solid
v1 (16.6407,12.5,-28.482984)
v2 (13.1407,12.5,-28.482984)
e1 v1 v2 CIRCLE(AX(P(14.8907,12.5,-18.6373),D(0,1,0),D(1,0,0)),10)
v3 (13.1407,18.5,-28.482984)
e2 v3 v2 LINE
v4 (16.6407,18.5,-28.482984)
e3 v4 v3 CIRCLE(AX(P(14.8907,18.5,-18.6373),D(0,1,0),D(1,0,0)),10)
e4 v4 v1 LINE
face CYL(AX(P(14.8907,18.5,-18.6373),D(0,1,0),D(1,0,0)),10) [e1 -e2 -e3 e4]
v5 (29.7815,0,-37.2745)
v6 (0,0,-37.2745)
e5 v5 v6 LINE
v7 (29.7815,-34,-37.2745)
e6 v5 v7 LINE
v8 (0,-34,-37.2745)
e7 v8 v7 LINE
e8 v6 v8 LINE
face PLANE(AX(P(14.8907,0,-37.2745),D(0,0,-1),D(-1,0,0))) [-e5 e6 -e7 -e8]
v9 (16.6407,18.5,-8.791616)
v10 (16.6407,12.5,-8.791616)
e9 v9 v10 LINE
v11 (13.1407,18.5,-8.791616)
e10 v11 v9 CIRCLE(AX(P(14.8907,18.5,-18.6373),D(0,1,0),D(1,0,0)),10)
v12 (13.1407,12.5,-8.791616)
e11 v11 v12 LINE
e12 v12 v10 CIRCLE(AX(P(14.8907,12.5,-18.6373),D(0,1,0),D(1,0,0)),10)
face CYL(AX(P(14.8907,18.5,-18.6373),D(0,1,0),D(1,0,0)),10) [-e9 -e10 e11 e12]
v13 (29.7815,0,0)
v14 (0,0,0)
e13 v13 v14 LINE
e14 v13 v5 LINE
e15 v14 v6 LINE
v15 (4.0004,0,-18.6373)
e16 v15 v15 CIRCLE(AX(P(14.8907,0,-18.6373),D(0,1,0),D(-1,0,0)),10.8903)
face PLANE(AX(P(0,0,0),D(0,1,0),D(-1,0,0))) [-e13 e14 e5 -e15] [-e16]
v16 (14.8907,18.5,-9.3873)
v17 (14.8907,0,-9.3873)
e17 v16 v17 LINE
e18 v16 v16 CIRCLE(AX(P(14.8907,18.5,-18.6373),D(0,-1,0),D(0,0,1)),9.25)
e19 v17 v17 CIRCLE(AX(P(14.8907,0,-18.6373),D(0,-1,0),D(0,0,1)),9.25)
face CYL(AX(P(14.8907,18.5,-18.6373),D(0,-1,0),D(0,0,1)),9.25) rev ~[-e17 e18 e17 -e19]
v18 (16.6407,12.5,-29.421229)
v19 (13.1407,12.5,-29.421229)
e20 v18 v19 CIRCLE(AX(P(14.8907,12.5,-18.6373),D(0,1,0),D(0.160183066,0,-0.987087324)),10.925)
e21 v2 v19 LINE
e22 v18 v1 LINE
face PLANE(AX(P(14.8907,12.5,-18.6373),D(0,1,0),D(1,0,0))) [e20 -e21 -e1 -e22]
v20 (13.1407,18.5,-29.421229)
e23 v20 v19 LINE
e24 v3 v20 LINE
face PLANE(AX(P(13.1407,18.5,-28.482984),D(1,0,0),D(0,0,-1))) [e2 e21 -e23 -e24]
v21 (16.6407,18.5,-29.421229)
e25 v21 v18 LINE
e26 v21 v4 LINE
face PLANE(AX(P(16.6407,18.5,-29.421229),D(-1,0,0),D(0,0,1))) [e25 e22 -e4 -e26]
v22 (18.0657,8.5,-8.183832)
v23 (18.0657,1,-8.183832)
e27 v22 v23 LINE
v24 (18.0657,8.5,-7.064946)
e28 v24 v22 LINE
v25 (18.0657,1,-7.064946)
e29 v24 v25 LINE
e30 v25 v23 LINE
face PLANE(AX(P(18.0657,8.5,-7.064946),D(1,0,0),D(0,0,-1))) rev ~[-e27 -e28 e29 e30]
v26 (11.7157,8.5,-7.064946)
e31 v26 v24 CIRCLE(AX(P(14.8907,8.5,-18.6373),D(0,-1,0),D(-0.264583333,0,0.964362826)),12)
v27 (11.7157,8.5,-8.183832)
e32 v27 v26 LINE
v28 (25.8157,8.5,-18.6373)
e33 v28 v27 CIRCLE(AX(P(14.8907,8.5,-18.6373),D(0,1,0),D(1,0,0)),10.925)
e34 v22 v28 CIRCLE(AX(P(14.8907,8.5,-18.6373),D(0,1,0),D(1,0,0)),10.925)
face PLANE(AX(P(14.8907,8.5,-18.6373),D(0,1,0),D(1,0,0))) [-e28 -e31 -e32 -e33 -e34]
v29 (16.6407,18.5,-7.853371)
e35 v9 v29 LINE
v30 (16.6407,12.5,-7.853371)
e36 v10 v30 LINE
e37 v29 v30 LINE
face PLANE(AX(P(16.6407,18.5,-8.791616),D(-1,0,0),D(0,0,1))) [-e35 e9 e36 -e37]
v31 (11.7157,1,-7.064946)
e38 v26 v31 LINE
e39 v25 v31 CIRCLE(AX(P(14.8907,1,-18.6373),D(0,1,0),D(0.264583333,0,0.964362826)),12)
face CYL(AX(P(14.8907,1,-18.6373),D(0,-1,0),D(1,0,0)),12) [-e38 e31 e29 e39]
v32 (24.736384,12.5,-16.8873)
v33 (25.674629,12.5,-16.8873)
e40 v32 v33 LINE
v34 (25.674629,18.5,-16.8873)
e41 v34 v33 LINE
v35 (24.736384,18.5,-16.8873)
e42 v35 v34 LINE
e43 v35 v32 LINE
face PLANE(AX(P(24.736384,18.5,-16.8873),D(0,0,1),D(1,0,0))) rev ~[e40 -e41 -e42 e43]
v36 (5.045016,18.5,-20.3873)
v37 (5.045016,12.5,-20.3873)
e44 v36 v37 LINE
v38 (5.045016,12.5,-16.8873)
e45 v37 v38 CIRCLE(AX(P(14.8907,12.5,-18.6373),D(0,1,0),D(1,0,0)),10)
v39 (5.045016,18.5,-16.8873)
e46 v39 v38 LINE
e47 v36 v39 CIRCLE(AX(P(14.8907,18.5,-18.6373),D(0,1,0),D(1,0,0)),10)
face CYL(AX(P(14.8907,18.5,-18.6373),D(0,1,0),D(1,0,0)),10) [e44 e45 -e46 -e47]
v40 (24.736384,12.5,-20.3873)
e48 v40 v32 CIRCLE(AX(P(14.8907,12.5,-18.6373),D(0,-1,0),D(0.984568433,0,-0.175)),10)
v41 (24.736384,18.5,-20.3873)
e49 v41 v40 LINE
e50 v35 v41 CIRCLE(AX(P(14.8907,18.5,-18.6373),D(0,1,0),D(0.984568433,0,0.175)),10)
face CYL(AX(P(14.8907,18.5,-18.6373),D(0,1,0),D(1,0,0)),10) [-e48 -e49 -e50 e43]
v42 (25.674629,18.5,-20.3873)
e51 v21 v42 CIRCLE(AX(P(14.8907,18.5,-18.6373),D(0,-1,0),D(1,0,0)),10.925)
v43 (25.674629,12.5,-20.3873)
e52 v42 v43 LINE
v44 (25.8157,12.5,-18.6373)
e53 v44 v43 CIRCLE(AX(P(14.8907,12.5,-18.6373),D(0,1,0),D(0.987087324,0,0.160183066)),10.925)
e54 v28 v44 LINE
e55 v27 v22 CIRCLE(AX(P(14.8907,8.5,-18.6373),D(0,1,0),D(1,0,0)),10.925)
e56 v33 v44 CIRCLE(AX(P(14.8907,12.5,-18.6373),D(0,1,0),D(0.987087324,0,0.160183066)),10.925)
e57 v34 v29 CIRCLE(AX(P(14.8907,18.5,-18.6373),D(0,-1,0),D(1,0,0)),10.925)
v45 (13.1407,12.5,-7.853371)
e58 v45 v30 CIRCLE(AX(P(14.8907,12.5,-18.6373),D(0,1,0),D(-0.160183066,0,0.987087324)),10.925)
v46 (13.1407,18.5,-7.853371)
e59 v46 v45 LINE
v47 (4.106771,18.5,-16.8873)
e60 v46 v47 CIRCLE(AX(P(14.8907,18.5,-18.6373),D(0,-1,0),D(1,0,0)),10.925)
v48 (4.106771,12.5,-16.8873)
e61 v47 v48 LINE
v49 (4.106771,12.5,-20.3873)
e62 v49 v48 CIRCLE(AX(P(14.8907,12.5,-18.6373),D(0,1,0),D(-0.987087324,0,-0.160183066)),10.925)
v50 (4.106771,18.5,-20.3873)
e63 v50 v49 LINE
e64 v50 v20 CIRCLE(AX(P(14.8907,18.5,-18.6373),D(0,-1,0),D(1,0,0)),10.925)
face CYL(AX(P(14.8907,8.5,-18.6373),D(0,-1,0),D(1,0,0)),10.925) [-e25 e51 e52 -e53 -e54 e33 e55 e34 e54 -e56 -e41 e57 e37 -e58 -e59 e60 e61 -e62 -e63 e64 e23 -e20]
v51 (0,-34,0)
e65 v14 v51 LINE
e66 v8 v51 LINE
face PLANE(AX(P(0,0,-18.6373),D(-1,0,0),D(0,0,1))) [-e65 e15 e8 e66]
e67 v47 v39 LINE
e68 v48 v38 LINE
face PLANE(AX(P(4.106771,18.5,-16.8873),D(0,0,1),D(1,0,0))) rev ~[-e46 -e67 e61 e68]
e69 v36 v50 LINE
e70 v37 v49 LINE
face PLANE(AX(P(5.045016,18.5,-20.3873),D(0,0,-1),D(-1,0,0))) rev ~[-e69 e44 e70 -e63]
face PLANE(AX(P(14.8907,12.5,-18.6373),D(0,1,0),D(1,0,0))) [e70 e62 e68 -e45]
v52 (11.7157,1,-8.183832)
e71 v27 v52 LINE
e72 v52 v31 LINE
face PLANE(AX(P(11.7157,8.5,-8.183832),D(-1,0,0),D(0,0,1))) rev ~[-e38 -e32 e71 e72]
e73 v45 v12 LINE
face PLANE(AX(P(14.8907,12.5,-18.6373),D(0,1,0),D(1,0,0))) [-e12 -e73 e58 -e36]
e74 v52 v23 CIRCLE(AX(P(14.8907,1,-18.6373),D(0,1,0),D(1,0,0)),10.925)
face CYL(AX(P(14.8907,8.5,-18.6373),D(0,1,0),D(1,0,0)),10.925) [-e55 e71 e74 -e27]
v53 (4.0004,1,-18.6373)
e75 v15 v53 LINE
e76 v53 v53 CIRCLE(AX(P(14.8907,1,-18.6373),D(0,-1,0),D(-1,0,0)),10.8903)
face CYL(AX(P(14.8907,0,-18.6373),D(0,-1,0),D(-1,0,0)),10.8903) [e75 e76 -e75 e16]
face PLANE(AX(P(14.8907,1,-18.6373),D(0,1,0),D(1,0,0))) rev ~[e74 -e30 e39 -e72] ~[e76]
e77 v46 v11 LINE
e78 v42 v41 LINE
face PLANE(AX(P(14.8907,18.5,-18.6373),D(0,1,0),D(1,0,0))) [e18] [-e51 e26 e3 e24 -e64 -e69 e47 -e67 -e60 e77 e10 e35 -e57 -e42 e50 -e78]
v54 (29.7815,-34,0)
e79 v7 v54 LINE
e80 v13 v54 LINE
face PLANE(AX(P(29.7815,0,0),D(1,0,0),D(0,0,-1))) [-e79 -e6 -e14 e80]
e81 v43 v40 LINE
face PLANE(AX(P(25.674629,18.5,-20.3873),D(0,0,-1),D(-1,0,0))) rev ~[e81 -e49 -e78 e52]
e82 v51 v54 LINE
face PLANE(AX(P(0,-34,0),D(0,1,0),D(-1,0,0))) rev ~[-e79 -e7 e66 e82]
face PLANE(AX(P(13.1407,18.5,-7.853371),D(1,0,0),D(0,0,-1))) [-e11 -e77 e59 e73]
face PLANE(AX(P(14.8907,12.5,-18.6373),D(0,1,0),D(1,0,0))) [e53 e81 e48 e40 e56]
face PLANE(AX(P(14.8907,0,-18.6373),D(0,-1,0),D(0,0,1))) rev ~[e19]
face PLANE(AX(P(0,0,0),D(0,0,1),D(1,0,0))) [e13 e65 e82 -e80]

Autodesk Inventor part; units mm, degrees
ref_plane "YZ Plane" through (0, 0, 0) normal (1, 0, 0) x (0, 1, 0)
ref_plane "XZ Plane" through (0, 0, 0) normal (0, 1, 0) x (-1, 0, 0)
ref_plane "XY Plane" through (0, 0, 0) normal (0, 0, 1) x (1, 0, 0)
sketch "Sketch1" plane through (0, 0, 0) normal (0, 1, 0) x (-1, 0, 0)
  line L0 (0, 0) -> (-29.7815, 0)
  line L1 (-29.7815, 0) -> (-29.7815, -37.2745)
  line L2 (-29.7815, -37.2745) -> (0, -37.2745)
  line L3 (0, -37.2745) -> (0, 0)
  line L4 (-14.8907, -37.2745) -> (-14.8907, 0)
  line L5 (0, -18.6373) -> (-29.7815, -18.6373)
  circle A0 centre (-14.8907, -18.6373) radius 10.8903
  dimension "d0" = 29.7815
  dimension "d1" = 37.2745
  dimension "d2" = 21.7805
extrude "Extrusion1" add sketch "Sketch1" against normal blind 34
extrude "Extrusion2" add sketch "Sketch1" along normal blind 1 contours A0 L5 L4 | L4 L5 A0 | A0 L4 L5 | L4 A0 L5
sketch "Sketch2" plane through (14.8907, 1, -18.6373) normal (0, 1, 0) x (1, 0, 0)
  circle A0 centre (0, 0) radius 12
  dimension "d9" = 24
extrude "Extrusion3" add sketch "Sketch2" along normal blind 7.5
sketch "Sketch3" plane through (14.8907, 8.5, -18.6373) normal (0, 1, 0) x (1, 0, 0)
  circle A0 centre (0, 0) radius 10.925
  circle A1 centre (0, 0) radius 12 projected
  line L0 (-3.175, -12) -> (3.175, -12)
  line L1 (3.175, -12) -> (3.175, 12)
  line L2 (3.175, 12) -> (-3.175, 12)
  line L3 (-3.175, 12) -> (-3.175, -12)
  line L4 (-3.175, -12) -> (3.175, 12) construction
  line L5 (3.175, -12) -> (-3.175, 12) construction
  point P0 (-3.175, -11.5724)
  point P1 (3.175, -11.5724)
  point P2 (-3.175, 11.5724)
  point P3 (3.175, 11.5724)
  point P4 (0, -12)
  point P5 (0, 12)
  point P6 (-3.175, -10.4535)
  point P7 (3.175, -10.4535)
  dimension "d12" = 21.85
  dimension "d21" = 6.35
extrude "Extrusion4" add sketch "Sketch3" along normal blind 10 contours A0 L1 | L1 A0 L3 | L3 A0
thread "Thread2" size "M24x0.75" class "6g" standard "ANSI Metric M Profile" full length
thread "Thread3" size "M22x0.75" class "6g" standard "ANSI Metric M Profile" length 10.0076 offset 4
extrude "Extrusion5" cut sketch "Sketch3" against normal up to surface (7.5 mm away) contours L1 A1 L3 A0 picked at (0, -11.2482)
sketch "Sketch4" plane through (14.8907, 18.5, -18.6373) normal (0, 1, 0) x (1, 0, 0)
  circle A0 centre (0, 0) radius 10.925 projected
  line L0 (-1.75, 10.925) -> (1.75, 10.925)
  line L1 (1.75, 10.925) -> (1.75, -10.925)
  line L2 (1.75, -10.925) -> (-1.75, -10.925)
  line L3 (-1.75, -10.925) -> (-1.75, 10.925)
  line L4 (-1.75, 10.925) -> (1.75, -10.925) construction
  line L5 (1.75, 10.925) -> (-1.75, -10.925) construction
  circle A1 centre (0, 0) radius 10
  line L6 (-10.925, -1.75) -> (10.925, -1.75)
  line L7 (10.925, -1.75) -> (10.925, 1.75)
  line L8 (10.925, 1.75) -> (-10.925, 1.75)
  line L9 (-10.925, 1.75) -> (-10.925, -1.75)
  line L10 (-10.925, -1.75) -> (10.925, 1.75) construction
  line L11 (10.925, -1.75) -> (-10.925, 1.75) construction
  point P0 (-9.8457, 1.75)
  point P1 (-10.7839, 1.75)
  point P2 (-10.7839, -1.75)
  point P3 (-9.8457, -1.75)
  point P4 (-1.75, 9.8457)
  point P5 (1.75, 9.8457)
  point P6 (1.75, 10.7839)
  point P7 (-1.75, 10.7839)
  point P8 (10.7839, 1.75)
  point P9 (9.8457, 1.75)
  point P10 (9.8457, -1.75)
  point P11 (10.7839, -1.75)
  point P12 (1.75, -9.8457)
  point P13 (-1.75, -9.8457)
  point P14 (-1.75, -10.7839)
  point P15 (1.75, -10.7839)
  dimension "d25" = 3.5
  dimension "d26" = 20
  dimension "d27" = 3.5
extrude "Extrusion6" cut sketch "Sketch4" against normal blind 6 contours A0 L6 A1 L8 | L1 A1 L3 A0 | A0 L3 A1 L1 | L8 A1 L6 A0
hole "Hole1" at (14.8907, 18.5, -18.6373) direction (0, -1, 0) diameter 18.5 depth 18.5
properties material "ABS Plastic"
